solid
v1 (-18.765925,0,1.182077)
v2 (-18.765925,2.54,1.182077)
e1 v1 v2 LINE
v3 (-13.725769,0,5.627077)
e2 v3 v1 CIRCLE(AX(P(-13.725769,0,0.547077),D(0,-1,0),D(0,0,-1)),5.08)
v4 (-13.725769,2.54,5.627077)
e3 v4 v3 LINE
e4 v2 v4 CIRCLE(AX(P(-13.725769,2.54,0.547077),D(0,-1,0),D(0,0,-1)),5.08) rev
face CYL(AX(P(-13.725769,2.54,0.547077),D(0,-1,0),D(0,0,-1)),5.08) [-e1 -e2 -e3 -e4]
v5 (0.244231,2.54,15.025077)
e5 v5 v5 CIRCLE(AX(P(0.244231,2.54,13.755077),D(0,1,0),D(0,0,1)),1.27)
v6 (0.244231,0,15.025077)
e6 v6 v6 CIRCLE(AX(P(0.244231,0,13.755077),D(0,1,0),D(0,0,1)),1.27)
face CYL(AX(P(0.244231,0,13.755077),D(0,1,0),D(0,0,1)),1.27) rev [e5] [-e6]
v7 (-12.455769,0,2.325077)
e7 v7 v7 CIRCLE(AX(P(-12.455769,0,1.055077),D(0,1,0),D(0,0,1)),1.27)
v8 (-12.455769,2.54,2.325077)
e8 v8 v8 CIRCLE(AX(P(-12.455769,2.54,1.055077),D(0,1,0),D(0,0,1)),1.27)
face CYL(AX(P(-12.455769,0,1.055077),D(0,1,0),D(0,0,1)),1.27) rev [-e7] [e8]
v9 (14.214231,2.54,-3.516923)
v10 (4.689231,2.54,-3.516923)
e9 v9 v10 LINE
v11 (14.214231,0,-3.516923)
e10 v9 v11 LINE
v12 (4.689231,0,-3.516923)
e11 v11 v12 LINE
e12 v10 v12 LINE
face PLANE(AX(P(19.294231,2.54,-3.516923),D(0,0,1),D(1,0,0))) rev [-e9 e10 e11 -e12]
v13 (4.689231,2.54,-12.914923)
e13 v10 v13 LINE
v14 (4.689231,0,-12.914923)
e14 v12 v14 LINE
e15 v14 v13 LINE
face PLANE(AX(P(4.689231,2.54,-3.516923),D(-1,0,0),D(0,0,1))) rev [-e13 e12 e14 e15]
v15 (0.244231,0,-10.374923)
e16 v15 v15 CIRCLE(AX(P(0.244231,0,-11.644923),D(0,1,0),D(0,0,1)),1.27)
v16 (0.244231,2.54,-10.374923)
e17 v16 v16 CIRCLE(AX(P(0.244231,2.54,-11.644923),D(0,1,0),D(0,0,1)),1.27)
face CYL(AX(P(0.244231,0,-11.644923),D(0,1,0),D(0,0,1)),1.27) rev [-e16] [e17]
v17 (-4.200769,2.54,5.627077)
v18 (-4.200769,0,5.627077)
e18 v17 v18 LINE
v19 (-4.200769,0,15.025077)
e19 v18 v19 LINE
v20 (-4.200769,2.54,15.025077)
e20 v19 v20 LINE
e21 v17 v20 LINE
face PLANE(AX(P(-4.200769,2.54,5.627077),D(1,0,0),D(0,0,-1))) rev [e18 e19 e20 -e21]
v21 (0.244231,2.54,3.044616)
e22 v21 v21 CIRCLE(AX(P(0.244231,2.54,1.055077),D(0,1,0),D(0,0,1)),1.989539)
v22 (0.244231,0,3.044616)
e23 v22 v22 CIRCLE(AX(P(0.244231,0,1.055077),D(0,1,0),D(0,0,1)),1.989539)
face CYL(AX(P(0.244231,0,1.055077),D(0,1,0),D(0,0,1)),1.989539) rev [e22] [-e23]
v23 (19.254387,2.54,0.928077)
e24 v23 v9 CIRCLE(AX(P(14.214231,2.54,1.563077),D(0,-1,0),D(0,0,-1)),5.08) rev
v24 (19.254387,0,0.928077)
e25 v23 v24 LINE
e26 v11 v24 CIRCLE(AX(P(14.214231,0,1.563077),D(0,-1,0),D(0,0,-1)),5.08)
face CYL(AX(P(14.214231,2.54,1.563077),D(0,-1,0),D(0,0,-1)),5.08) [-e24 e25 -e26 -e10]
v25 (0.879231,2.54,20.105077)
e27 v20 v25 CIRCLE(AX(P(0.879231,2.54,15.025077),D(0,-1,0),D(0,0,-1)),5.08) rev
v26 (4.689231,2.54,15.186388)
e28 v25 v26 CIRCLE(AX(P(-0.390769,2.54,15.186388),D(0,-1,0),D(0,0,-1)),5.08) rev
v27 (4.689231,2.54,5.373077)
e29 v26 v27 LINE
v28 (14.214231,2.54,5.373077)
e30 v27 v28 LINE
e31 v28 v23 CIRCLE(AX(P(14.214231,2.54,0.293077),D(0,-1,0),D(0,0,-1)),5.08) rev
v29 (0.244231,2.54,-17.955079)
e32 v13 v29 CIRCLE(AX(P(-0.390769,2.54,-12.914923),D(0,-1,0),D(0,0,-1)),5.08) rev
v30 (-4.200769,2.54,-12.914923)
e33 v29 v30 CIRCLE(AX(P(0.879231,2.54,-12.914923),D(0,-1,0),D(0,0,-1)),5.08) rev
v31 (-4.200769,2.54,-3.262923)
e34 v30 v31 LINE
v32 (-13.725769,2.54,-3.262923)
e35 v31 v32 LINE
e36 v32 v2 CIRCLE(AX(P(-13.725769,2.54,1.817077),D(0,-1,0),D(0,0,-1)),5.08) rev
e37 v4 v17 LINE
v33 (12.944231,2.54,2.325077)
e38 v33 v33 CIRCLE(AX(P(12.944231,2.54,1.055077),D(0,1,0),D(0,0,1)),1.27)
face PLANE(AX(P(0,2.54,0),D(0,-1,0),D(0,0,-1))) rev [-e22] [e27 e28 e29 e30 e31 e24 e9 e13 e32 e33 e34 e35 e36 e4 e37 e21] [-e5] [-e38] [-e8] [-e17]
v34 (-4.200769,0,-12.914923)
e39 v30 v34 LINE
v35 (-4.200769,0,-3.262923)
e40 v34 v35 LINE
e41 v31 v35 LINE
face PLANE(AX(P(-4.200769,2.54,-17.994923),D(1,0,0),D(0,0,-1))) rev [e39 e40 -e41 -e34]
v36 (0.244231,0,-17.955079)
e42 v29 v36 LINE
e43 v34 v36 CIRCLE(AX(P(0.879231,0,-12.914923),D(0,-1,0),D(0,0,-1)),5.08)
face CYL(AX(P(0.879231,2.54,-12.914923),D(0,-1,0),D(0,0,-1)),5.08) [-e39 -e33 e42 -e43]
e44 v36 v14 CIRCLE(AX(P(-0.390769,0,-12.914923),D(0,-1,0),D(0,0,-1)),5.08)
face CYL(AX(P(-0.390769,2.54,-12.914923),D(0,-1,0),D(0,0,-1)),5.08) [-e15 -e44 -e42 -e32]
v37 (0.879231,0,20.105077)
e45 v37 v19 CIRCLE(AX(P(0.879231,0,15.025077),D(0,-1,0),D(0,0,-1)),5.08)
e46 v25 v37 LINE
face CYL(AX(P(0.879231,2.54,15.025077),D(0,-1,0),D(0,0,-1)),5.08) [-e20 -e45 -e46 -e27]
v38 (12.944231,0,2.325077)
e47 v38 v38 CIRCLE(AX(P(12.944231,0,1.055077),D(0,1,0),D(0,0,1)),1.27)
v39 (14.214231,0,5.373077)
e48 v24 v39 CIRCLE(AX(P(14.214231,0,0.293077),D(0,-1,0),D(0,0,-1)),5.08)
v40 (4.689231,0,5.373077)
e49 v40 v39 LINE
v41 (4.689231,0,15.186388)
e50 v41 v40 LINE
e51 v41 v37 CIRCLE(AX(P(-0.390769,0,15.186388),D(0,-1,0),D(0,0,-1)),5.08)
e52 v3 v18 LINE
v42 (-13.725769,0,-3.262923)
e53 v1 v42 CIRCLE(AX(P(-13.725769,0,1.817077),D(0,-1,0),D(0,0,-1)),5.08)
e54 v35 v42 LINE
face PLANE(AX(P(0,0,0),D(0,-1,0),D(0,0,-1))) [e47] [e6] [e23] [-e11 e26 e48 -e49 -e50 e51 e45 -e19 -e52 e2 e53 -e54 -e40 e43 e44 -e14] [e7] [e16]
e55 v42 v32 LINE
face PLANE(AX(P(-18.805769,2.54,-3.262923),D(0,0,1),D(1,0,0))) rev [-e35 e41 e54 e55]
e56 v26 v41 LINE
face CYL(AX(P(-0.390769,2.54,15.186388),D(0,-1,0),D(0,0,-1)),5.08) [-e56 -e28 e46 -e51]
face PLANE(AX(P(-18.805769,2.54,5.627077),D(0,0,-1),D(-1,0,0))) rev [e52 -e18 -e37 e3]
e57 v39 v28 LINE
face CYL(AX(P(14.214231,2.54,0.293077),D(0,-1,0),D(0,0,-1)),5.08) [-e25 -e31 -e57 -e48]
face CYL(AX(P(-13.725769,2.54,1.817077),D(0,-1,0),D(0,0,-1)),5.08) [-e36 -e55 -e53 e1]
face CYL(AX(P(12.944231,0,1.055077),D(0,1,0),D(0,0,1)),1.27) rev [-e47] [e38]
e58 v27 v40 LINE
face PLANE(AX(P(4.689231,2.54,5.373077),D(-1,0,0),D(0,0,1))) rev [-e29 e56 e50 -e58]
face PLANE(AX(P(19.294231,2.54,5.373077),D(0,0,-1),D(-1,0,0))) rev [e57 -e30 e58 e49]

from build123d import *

# Parameters (mm, degrees)
BOSS_EXTRUDE1_DEPTH = 2.54
FILLET1_R           = 5.08
FILLET2_R           = 5.08
SKETCH2_R           = 1.989538673
SKETCH2_R_2         = 1.27
CUT_EXTRUDE1_DEPTH  = 2.54


with BuildPart() as part:
    # Sketch1 → Boss-Extrude1 (new body)
    with BuildSketch(Plane(origin=(0, 0, 0), x_dir=(1, 0, 0), z_dir=(0, 1, 0))):
        Polygon((-4.200769231, 17.994923077), (-4.200769231, 3.262923077), (-18.805769231, 3.262923077), (-18.805769231, -5.627076923), (-4.200769231, -5.627076923), (-4.200769231, -20.105076923), (4.689230769, -20.105076923), (4.689230769, -5.373076923), (19.294230769, -5.373076923), (19.294230769, 3.516923077), (4.689230769, 3.516923077), (4.689230769, 17.994923077), align=None)
    extrude(amount=BOSS_EXTRUDE1_DEPTH)

    # Fillet1
    fillet1_edges = [part.edges().sort_by_distance(p)[0] for p in [
        (-4.200769231, 1.27, 20.105076923),
    ]]
    fillet(fillet1_edges, radius=FILLET1_R)

    # Fillet2
    # the kernel refuses this fillet: 5.08 mm, written as the material it takes off along each edge
    with BuildSketch(Plane(origin=(-4.200769231, -12.7, -17.994923077), x_dir=(0, 0, 1), z_dir=(0, 1, 0)), Plane(origin=(-18.805769231, -12.7, -3.262923077), x_dir=(0, 0, 1), z_dir=(0, 1, 0)), Plane(origin=(-18.805769231, -12.7, 5.627076923), x_dir=(1, 0, 0), z_dir=(0, 1, 0)), Plane(origin=(4.689230769, -12.7, -17.994923077), x_dir=(-1, 0, 0), z_dir=(0, 1, 0))) as fillet2_piece_1:
        with BuildLine():
            CenterArc((FILLET2_R, FILLET2_R), FILLET2_R, 180, 90)
            Line((0, FILLET2_R), (-FILLET2_R * 0.02, FILLET2_R))
            Line((-FILLET2_R * 0.02, FILLET2_R), (-FILLET2_R * 0.02, -FILLET2_R * 0.02))
            Line((-FILLET2_R * 0.02, -FILLET2_R * 0.02), (FILLET2_R, -FILLET2_R * 0.02))
            Line((FILLET2_R, -FILLET2_R * 0.02), (FILLET2_R, 0))
        make_face()
    extrude(amount=27.94, mode=Mode.SUBTRACT)
    with BuildSketch(Plane(origin=(19.294230769, -12.7, -3.516923077), x_dir=(0, 0, 1), z_dir=(0, 1, 0)), Plane(origin=(19.294230769, -12.7, 5.373076923), x_dir=(-1, 0, 0), z_dir=(0, 1, 0))) as fillet2_piece_2:
        with BuildLine():
            CenterArc((FILLET2_R, -FILLET2_R), FILLET2_R, 90, 90)
            Line((0, -FILLET2_R), (-FILLET2_R * 0.02, -FILLET2_R))
            Line((-FILLET2_R * 0.02, -FILLET2_R), (-FILLET2_R * 0.02, FILLET2_R * 0.02))
            Line((-FILLET2_R * 0.02, FILLET2_R * 0.02), (FILLET2_R, FILLET2_R * 0.02))
            Line((FILLET2_R, FILLET2_R * 0.02), (FILLET2_R, 0))
        make_face()
    extrude(amount=27.94, mode=Mode.SUBTRACT)
    with BuildSketch(Plane(origin=(4.689230769, -12.296722124, 20.105076923), x_dir=(-1, 0, 0), z_dir=(0, 1, 0))) as fillet2_piece_3:
        with BuildLine():
            CenterArc((5.08, -4.91868885), FILLET2_R, 104.477512186, 75.522487814)
            Line((0, -4.91868885), (-0.1016, -4.91868885))
            Line((-0.1016, -4.91868885), (-0.1016, 0))
            Line((-0.1016, 0), (0, 0.1016))
            ThreePointArc((0, 0.1016), (1.905, 0.1016), (3.7846, 0.098373777))
            Line((3.7846, 0.098373777), (3.81, 0))
        make_face()
    extrude(amount=27.133444248, mode=Mode.SUBTRACT)

    # Sketch2 → Cut-Extrude1 (cut)
    with BuildSketch(Plane(origin=(0, 2.54, 0), x_dir=(1, 0, 0), z_dir=(0, 1, 0))):
        with Locations(Location((0.244230769, -1.055076923, 0), (0, 0, 270))):
            Circle(SKETCH2_R)
        with Locations(Location((0.244230769, 11.644923077, 0), (0, 0, 270))):
            Circle(SKETCH2_R_2)
        with Locations(Location((0.244230769, -13.755076923, 0), (0, 0, 270))):
            Circle(SKETCH2_R_2)
        with Locations(Location((-12.455769231, -1.055076923, 0), (0, 0, 270))):
            Circle(SKETCH2_R_2)
        with Locations(Location((12.944230769, -1.055076923, 0), (0, 0, 270))):
            Circle(SKETCH2_R_2)
    extrude(amount=-CUT_EXTRUDE1_DEPTH, mode=Mode.SUBTRACT)


solid = part.part
